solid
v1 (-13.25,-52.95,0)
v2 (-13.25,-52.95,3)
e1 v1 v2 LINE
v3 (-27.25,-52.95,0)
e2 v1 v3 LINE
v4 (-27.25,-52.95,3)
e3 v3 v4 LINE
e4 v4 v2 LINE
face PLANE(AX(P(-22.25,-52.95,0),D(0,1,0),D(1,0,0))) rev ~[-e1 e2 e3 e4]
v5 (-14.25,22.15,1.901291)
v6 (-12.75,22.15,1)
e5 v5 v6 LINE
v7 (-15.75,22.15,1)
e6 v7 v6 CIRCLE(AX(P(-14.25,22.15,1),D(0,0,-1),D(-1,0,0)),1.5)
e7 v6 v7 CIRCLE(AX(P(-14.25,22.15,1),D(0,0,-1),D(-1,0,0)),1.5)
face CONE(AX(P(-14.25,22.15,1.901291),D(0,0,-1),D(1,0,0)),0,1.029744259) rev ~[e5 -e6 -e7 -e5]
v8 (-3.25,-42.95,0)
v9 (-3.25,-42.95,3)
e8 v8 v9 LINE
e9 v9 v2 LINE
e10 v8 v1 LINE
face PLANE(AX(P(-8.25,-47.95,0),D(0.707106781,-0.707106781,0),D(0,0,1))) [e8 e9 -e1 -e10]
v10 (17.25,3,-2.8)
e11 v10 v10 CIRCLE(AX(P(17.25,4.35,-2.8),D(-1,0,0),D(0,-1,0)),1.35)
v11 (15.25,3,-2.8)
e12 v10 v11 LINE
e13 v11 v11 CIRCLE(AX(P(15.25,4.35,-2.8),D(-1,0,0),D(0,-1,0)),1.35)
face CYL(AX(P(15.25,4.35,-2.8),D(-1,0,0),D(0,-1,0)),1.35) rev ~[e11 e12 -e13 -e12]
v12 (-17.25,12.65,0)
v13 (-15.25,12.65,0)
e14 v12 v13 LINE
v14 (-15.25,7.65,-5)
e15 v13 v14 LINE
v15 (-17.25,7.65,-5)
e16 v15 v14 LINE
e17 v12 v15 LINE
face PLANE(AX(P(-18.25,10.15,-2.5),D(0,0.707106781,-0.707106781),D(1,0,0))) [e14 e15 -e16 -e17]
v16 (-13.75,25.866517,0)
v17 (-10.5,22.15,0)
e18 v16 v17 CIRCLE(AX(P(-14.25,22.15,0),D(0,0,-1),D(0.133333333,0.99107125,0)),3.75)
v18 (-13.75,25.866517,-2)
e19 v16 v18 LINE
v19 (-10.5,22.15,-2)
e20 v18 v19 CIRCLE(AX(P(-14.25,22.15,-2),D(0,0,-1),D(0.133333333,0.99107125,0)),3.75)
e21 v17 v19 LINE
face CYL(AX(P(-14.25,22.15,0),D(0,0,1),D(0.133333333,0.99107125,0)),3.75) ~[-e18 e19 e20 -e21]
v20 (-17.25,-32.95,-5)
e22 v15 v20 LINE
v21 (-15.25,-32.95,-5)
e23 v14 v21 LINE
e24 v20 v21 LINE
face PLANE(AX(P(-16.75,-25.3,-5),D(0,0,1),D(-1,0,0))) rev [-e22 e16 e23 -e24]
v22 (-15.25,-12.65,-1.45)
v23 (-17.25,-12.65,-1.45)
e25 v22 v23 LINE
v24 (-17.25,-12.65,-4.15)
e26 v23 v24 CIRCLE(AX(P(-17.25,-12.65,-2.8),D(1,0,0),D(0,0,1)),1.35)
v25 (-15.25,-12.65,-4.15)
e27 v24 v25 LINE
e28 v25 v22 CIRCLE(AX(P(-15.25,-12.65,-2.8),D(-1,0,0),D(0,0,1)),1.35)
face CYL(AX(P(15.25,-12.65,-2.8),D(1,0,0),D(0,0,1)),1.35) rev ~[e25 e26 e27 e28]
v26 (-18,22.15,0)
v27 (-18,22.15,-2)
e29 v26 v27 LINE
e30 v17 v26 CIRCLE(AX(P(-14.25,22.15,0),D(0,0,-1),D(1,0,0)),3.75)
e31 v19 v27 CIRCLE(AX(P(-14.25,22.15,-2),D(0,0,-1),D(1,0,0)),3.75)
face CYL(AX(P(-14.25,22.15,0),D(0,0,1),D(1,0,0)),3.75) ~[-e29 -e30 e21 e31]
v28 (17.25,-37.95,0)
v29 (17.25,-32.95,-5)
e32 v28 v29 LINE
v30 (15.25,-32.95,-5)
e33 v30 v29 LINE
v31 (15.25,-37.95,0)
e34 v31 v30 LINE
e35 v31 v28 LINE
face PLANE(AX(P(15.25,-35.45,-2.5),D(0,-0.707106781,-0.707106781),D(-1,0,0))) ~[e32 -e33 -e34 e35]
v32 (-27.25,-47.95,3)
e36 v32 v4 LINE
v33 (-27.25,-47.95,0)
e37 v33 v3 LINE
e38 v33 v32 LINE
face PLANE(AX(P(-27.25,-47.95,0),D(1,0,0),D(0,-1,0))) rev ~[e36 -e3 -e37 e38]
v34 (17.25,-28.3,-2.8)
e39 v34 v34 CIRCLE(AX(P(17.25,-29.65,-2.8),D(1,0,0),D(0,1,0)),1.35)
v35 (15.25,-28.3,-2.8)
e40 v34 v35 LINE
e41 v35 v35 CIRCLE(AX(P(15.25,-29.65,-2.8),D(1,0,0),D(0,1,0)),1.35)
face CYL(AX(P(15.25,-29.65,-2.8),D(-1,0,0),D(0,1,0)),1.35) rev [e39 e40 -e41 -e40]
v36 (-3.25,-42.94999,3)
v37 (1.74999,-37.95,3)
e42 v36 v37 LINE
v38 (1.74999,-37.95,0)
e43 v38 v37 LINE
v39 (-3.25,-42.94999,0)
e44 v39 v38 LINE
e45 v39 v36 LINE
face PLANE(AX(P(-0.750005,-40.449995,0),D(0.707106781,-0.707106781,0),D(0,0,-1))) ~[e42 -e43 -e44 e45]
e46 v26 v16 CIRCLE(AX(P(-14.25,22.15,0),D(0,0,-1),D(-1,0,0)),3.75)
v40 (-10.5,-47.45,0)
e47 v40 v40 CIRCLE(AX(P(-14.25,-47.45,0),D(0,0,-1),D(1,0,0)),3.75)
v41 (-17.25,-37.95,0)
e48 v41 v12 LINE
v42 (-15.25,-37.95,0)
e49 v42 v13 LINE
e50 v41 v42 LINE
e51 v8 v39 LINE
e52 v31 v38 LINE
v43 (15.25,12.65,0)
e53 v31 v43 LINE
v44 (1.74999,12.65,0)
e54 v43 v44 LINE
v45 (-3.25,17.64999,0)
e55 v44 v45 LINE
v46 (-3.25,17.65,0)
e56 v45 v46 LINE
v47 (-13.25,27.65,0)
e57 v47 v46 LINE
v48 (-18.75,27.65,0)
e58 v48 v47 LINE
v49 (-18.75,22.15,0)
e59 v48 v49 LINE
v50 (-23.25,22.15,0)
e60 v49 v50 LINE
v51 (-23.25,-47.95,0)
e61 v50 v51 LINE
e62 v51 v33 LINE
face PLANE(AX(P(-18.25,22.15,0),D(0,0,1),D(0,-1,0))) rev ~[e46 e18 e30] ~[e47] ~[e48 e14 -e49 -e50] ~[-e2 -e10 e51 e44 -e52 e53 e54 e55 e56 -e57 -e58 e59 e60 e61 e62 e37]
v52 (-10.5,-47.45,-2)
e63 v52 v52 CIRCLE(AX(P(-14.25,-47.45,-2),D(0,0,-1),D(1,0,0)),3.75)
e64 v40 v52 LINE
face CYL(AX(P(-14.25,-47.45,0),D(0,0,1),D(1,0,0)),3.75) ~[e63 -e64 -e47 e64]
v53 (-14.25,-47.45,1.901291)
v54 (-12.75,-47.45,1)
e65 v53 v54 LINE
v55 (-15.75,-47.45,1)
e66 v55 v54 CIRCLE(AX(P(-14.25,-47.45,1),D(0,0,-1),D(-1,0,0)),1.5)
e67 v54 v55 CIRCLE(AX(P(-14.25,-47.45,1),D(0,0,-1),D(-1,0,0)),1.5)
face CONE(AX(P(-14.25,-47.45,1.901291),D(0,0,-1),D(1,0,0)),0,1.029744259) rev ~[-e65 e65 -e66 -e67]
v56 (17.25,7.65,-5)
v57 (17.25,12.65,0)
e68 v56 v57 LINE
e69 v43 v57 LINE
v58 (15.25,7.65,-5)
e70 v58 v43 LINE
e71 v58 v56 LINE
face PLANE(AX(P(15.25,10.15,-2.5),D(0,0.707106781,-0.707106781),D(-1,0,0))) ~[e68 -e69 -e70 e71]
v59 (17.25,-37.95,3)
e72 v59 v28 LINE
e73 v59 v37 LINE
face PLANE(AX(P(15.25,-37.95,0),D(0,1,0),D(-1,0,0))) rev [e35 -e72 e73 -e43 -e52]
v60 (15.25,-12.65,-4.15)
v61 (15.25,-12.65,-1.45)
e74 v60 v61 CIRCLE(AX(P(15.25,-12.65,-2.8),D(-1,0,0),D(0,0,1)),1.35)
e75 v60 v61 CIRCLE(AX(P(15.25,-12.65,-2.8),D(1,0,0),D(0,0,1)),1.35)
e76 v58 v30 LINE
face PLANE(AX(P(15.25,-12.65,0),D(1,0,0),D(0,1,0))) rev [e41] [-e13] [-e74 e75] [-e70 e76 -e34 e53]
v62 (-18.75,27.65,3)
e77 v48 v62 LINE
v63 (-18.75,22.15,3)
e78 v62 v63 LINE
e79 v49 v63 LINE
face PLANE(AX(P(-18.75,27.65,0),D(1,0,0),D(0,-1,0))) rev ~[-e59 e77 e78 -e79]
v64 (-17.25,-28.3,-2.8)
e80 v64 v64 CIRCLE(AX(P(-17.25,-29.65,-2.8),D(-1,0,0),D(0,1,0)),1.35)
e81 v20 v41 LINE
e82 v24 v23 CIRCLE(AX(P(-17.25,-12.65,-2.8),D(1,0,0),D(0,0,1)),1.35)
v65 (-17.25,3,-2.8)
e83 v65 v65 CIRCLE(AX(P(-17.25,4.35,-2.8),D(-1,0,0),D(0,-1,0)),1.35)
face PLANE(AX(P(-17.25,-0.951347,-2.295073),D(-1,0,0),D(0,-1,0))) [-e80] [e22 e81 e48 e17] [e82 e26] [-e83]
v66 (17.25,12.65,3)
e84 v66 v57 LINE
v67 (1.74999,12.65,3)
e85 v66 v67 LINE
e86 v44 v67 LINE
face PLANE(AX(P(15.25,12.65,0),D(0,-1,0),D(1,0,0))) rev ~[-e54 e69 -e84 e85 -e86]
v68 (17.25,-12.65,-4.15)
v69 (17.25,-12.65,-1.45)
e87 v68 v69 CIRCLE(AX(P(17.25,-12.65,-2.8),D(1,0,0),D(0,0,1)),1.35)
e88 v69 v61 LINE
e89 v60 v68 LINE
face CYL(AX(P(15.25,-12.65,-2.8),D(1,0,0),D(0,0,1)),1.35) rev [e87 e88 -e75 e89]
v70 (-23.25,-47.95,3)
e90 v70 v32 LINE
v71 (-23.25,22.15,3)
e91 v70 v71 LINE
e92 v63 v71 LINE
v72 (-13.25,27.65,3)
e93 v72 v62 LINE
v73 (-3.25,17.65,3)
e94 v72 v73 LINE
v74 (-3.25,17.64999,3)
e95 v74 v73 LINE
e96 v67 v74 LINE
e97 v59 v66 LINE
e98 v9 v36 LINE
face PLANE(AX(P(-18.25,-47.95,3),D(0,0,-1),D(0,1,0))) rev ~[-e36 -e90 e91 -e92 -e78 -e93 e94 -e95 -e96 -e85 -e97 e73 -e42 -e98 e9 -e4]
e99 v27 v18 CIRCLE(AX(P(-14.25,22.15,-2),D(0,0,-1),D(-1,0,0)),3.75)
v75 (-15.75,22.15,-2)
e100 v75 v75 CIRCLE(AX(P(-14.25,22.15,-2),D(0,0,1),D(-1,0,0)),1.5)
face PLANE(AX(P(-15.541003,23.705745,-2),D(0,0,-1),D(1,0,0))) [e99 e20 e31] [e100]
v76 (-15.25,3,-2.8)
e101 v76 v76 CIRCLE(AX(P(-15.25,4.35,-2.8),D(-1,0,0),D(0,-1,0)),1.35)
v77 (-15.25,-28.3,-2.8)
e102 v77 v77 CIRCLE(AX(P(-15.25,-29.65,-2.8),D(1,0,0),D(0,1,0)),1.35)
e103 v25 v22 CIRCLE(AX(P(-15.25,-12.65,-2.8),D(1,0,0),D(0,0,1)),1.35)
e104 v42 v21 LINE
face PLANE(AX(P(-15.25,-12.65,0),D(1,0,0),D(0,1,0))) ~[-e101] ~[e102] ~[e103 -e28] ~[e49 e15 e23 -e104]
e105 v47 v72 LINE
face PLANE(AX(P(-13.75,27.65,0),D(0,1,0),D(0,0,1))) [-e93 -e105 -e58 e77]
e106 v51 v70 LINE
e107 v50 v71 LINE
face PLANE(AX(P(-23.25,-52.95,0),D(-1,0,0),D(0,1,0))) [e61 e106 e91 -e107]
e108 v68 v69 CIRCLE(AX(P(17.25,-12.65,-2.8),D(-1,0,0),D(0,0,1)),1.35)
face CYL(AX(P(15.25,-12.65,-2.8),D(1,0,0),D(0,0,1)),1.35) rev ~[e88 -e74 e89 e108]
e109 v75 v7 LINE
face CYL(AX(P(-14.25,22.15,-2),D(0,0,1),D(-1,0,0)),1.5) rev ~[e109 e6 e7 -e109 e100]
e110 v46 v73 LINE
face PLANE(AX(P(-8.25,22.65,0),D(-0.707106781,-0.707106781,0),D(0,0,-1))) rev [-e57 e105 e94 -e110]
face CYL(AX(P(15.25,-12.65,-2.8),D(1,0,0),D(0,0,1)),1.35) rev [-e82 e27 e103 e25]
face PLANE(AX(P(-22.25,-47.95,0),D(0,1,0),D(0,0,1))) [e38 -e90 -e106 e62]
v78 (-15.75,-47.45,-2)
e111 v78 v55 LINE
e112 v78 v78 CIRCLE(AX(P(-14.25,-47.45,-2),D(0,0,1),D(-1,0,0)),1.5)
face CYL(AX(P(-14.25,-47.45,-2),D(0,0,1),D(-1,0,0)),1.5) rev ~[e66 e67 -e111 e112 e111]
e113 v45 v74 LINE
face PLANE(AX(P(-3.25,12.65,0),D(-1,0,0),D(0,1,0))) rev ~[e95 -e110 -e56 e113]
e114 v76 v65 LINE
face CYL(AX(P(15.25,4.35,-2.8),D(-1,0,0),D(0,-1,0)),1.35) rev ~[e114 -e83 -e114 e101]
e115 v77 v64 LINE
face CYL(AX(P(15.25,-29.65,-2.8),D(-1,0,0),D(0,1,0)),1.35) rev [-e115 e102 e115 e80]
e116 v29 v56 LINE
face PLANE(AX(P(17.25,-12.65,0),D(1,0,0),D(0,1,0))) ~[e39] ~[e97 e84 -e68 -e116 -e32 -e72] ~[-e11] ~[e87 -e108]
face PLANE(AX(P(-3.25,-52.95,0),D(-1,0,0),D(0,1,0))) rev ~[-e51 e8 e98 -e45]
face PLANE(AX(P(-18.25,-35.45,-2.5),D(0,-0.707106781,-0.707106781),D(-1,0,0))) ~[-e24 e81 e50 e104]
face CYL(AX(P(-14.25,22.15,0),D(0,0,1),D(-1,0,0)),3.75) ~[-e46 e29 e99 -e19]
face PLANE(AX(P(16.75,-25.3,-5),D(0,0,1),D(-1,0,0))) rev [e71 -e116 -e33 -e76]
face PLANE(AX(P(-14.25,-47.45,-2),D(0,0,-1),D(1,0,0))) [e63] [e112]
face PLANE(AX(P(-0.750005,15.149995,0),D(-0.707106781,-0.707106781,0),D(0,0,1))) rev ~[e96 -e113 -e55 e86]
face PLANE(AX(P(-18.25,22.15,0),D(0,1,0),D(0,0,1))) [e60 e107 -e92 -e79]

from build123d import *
from build123d import SkipClean  # not in build123d's __all__

# Parameters (mm, degrees)
F0_W                   = 3
F0_H                   = 25.3
F0_W_2                 = 30.5
F1_DEPTH               = 3
F2_DEPTH               = 5
F3_R                   = 1.35
F4_DEPTH               = 500
F7_SIZE                = 5
F8_R                   = 1.35
F9_DEPTH               = 1
F10_W                  = 15
F10_H                  = 15
F11_DEPTH              = 3
F12_W                  = 4
F12_H                  = 5
F13_DEPTH              = 3
F12_W_2                = 4.5
F12_H_2                = 5.5
F14_DEPTH              = 25
F15_DEPTH              = 5
F16_R                  = 3.75
F17_DEPTH              = 2
F20_D                  = 3
F20_DEPTH              = 3
F20_CBORE_D            = 3
F20_CBORE_DEPTH        = 3
F20_TIP                = 0.9012909285
F20_ON_F19_D           = 3
F20_ON_F19_DEPTH       = 3
F20_ON_F19_CBORE_D     = 3
F20_ON_F19_CBORE_DEPTH = 3
F20_ON_F19_TIP         = 0.9012909285
F21_SIZE               = 10
F22_DEPTH              = 1
F23_SIZE               = 4.99999


# Not quite as in the source:
# - a fillet or chamfer is up to 0.001 mm smaller than in the source, because OpenCascade refuses the exact size


with BuildPart() as f1:
    # F0 (on Top) → F1 (new body)
    with BuildSketch(Plane.XY):
        with Locations((16.75, 0)):
            Rectangle(F0_W, F0_H)
        Rectangle(F0_W_2, F0_H)
        with Locations((-16.75, 0)):
            Rectangle(F0_W, F0_H)
    extrude(amount=F1_DEPTH)

    # F0 (on Top) → F2 (join)
    with BuildSketch(Plane.XY):
        with Locations((16.75, 0)):
            Rectangle(F0_W, F0_H)
        with Locations((-16.75, 0)):
            Rectangle(F0_W, F0_H)
    extrude(amount=-F2_DEPTH)

    # F3 (on face) → F4 (cut, symmetric)
    with BuildSketch(Plane(origin=(15.25, 0, 0), x_dir=(0, -1, 0), z_dir=(-1, 0, 0))):
        with BuildLine():
            Line((12.65, -4.15), (12.65, -1.45))
            ThreePointArc((12.65, -1.45), (11.3, -2.8), (12.65, -4.15))
        make_face()
        with Locations((-4.35, -2.8)):
            Circle(F3_R)
    extrude(amount=F4_DEPTH, both=True, mode=Mode.SUBTRACT)

    # F6: F1 across plane


with BuildPart() as f1_1:
    add(f1.part, clean=False)
    with SkipClean():  # cleaning this boolean's faces spoils the solid; the shape is the same uncleaned
        add(f1.part.mirror(Plane.XZ.offset(12.65)), clean=False)

    # F7
    f7_edges = [f1_1.edges().sort_by_distance(p)[0] for p in [
        (-16.75, 12.65, -5),
        (16.75, 12.65, -5),
        (16.75, -37.95, -5),
        (-16.75, -37.95, -5),
    ]]
    chamfer(f7_edges, length=F7_SIZE)

    # F8 (on face) → F9 (cut)
    with BuildSketch(Plane(origin=(-18.25, 0, 0), x_dir=(0, -1, 0), z_dir=(-1, 0, 0))):
        with BuildLine():
            Line((12.65, 0), (-12.65, 0))
            Line((-12.65, 0), (-7.65, -5))
            Line((-7.65, -5), (12.65, -5))
            Line((12.65, -5), (12.65, -4.15))
            ThreePointArc((12.65, -4.15), (11.3, -2.8), (12.65, -1.45))
            Line((12.65, -1.45), (12.65, 0))
        make_face()
        with Locations((-4.35, -2.8)):
            Circle(F8_R, mode=Mode.SUBTRACT)
        with BuildLine():
            Line((37.95, 0), (12.65, 0))
            Line((12.65, 0), (12.65, -1.45))
            ThreePointArc((12.65, -1.45), (14, -2.8), (12.65, -4.15))
            Line((12.65, -4.15), (12.65, -5))
            Line((12.65, -5), (32.95, -5))
            Line((32.95, -5), (37.95, 0))
        make_face()
        with Locations((29.65, -2.8)):
            Circle(F8_R, mode=Mode.SUBTRACT)
    extrude(amount=-F9_DEPTH, mode=Mode.SUBTRACT)

    # F10 (on Top) → F11 (join)
    with BuildSketch(Plane.XY):
        with Locations((-10.75, -45.45)):
            Rectangle(F10_W, F10_H)
        with Locations((-10.75, 20.15)):
            Rectangle(F10_W, F10_H)
    extrude(amount=F11_DEPTH)

    # F12 (on face) → F13 (join)
    with BuildSketch(Plane(origin=(0, 0, 0), x_dir=(1, 0, 0), z_dir=(0, 0, -1))):
        with Locations((-20.25, 50.45)):
            Rectangle(F12_W, F12_H)
    extrude(amount=-F13_DEPTH)

    # F12 (on face) → F14 (cut)
    with BuildSketch(Plane(origin=(0, 0, 0), x_dir=(1, 0, 0), z_dir=(0, 0, -1))):
        with Locations((-16, -24.9)):
            Rectangle(F12_W_2, F12_H_2)
    extrude(amount=-F14_DEPTH, mode=Mode.SUBTRACT)

    # F15 (add): faces of the model
    f15_faces = [f1_1.faces().sort_by_distance(p)[0] for p in [
        (-18.25, 0, 1.5),
        (-18.25, -25.3, 1.5),
        (-18.25, -42.95, 1.5),
        (-18.25, 17.4, 1.5),
        (-22.25, -50.45, 1.5),
        (-13.75, 24.9, 1.5),
    ]]
    extrude(f15_faces, amount=F15_DEPTH)

    # F16 (on face) → F17 (join)
    with BuildSketch(Plane(origin=(0, 0, 0), x_dir=(1, 0, 0), z_dir=(0, 0, -1))):
        with BuildLine():
            Line((-13.75, -22.15), (-18, -22.15))
            ThreePointArc((-18, -22.15), (-16.7185522073, -24.9728974477), (-13.75, -25.8665171868))
            Line((-13.75, -25.8665171868), (-13.75, -22.15))
        make_face()
        with BuildLine():
            ThreePointArc((-13.75, -25.8665171868), (-11.4271025523, -24.6185522073), (-10.5, -22.15))
            ThreePointArc((-10.5, -22.15), (-14.25, -18.4), (-18, -22.15))
            Line((-18, -22.15), (-13.75, -22.15))
            Line((-13.75, -22.15), (-13.75, -25.8665171868))
        make_face()
        with Locations((-14.25, 47.45)):
            Circle(F16_R)
    extrude(amount=F17_DEPTH)

    # F20
    with Locations(Plane(origin=(0, 0, -2), x_dir=(1, 0, 0), z_dir=(0, 0, -1))):
        with Locations((-14.25, 47.45)):
            CounterBoreHole(F20_D / 2, F20_CBORE_D / 2, F20_CBORE_DEPTH, depth=F20_DEPTH)
            with Locations((0, 0, -(F20_DEPTH + F20_TIP / 2))):  # 118° drill point
                Cone(0, F20_D / 2, F20_TIP, mode=Mode.SUBTRACT)

    # F20 on F19
    with Locations(Plane(origin=(0, 0, -2), x_dir=(1, 0, 0), z_dir=(0, 0, -1))):
        with Locations((-14.25, -22.15)):
            CounterBoreHole(F20_ON_F19_D / 2, F20_ON_F19_CBORE_D / 2, F20_ON_F19_CBORE_DEPTH, depth=F20_ON_F19_DEPTH)
            with Locations((0, 0, -(F20_ON_F19_DEPTH + F20_ON_F19_TIP / 2))):  # 118° drill point
                Cone(0, F20_ON_F19_D / 2, F20_ON_F19_TIP, mode=Mode.SUBTRACT)

    # F21
    f21_edges = [f1_1.edges().sort_by_distance(p)[0] for p in [
        (-3.25, 27.65, 1.5),
        (-3.25, -52.95, 1.5),
    ]]
    chamfer(f21_edges, length=F21_SIZE)

    # F22 (cut): a face of the model
    f22_faces = [f1_1.faces().sort_by_distance(p)[0] for p in [
        (18.25, -12.65, -0.7538732148),
    ]]
    extrude(f22_faces, amount=-F22_DEPTH, mode=Mode.SUBTRACT)

    # F23 (size 5 in the source; OpenCascade refuses exactly that, so slightly less here)
    f23_edges = [f1_1.edges().sort_by_distance(p)[0] for p in [
        (-3.25, -37.95, 1.5),
        (-3.25, 12.65, 1.5),
    ]]
    chamfer(f23_edges, length=F23_SIZE)


solid = f1_1.part
